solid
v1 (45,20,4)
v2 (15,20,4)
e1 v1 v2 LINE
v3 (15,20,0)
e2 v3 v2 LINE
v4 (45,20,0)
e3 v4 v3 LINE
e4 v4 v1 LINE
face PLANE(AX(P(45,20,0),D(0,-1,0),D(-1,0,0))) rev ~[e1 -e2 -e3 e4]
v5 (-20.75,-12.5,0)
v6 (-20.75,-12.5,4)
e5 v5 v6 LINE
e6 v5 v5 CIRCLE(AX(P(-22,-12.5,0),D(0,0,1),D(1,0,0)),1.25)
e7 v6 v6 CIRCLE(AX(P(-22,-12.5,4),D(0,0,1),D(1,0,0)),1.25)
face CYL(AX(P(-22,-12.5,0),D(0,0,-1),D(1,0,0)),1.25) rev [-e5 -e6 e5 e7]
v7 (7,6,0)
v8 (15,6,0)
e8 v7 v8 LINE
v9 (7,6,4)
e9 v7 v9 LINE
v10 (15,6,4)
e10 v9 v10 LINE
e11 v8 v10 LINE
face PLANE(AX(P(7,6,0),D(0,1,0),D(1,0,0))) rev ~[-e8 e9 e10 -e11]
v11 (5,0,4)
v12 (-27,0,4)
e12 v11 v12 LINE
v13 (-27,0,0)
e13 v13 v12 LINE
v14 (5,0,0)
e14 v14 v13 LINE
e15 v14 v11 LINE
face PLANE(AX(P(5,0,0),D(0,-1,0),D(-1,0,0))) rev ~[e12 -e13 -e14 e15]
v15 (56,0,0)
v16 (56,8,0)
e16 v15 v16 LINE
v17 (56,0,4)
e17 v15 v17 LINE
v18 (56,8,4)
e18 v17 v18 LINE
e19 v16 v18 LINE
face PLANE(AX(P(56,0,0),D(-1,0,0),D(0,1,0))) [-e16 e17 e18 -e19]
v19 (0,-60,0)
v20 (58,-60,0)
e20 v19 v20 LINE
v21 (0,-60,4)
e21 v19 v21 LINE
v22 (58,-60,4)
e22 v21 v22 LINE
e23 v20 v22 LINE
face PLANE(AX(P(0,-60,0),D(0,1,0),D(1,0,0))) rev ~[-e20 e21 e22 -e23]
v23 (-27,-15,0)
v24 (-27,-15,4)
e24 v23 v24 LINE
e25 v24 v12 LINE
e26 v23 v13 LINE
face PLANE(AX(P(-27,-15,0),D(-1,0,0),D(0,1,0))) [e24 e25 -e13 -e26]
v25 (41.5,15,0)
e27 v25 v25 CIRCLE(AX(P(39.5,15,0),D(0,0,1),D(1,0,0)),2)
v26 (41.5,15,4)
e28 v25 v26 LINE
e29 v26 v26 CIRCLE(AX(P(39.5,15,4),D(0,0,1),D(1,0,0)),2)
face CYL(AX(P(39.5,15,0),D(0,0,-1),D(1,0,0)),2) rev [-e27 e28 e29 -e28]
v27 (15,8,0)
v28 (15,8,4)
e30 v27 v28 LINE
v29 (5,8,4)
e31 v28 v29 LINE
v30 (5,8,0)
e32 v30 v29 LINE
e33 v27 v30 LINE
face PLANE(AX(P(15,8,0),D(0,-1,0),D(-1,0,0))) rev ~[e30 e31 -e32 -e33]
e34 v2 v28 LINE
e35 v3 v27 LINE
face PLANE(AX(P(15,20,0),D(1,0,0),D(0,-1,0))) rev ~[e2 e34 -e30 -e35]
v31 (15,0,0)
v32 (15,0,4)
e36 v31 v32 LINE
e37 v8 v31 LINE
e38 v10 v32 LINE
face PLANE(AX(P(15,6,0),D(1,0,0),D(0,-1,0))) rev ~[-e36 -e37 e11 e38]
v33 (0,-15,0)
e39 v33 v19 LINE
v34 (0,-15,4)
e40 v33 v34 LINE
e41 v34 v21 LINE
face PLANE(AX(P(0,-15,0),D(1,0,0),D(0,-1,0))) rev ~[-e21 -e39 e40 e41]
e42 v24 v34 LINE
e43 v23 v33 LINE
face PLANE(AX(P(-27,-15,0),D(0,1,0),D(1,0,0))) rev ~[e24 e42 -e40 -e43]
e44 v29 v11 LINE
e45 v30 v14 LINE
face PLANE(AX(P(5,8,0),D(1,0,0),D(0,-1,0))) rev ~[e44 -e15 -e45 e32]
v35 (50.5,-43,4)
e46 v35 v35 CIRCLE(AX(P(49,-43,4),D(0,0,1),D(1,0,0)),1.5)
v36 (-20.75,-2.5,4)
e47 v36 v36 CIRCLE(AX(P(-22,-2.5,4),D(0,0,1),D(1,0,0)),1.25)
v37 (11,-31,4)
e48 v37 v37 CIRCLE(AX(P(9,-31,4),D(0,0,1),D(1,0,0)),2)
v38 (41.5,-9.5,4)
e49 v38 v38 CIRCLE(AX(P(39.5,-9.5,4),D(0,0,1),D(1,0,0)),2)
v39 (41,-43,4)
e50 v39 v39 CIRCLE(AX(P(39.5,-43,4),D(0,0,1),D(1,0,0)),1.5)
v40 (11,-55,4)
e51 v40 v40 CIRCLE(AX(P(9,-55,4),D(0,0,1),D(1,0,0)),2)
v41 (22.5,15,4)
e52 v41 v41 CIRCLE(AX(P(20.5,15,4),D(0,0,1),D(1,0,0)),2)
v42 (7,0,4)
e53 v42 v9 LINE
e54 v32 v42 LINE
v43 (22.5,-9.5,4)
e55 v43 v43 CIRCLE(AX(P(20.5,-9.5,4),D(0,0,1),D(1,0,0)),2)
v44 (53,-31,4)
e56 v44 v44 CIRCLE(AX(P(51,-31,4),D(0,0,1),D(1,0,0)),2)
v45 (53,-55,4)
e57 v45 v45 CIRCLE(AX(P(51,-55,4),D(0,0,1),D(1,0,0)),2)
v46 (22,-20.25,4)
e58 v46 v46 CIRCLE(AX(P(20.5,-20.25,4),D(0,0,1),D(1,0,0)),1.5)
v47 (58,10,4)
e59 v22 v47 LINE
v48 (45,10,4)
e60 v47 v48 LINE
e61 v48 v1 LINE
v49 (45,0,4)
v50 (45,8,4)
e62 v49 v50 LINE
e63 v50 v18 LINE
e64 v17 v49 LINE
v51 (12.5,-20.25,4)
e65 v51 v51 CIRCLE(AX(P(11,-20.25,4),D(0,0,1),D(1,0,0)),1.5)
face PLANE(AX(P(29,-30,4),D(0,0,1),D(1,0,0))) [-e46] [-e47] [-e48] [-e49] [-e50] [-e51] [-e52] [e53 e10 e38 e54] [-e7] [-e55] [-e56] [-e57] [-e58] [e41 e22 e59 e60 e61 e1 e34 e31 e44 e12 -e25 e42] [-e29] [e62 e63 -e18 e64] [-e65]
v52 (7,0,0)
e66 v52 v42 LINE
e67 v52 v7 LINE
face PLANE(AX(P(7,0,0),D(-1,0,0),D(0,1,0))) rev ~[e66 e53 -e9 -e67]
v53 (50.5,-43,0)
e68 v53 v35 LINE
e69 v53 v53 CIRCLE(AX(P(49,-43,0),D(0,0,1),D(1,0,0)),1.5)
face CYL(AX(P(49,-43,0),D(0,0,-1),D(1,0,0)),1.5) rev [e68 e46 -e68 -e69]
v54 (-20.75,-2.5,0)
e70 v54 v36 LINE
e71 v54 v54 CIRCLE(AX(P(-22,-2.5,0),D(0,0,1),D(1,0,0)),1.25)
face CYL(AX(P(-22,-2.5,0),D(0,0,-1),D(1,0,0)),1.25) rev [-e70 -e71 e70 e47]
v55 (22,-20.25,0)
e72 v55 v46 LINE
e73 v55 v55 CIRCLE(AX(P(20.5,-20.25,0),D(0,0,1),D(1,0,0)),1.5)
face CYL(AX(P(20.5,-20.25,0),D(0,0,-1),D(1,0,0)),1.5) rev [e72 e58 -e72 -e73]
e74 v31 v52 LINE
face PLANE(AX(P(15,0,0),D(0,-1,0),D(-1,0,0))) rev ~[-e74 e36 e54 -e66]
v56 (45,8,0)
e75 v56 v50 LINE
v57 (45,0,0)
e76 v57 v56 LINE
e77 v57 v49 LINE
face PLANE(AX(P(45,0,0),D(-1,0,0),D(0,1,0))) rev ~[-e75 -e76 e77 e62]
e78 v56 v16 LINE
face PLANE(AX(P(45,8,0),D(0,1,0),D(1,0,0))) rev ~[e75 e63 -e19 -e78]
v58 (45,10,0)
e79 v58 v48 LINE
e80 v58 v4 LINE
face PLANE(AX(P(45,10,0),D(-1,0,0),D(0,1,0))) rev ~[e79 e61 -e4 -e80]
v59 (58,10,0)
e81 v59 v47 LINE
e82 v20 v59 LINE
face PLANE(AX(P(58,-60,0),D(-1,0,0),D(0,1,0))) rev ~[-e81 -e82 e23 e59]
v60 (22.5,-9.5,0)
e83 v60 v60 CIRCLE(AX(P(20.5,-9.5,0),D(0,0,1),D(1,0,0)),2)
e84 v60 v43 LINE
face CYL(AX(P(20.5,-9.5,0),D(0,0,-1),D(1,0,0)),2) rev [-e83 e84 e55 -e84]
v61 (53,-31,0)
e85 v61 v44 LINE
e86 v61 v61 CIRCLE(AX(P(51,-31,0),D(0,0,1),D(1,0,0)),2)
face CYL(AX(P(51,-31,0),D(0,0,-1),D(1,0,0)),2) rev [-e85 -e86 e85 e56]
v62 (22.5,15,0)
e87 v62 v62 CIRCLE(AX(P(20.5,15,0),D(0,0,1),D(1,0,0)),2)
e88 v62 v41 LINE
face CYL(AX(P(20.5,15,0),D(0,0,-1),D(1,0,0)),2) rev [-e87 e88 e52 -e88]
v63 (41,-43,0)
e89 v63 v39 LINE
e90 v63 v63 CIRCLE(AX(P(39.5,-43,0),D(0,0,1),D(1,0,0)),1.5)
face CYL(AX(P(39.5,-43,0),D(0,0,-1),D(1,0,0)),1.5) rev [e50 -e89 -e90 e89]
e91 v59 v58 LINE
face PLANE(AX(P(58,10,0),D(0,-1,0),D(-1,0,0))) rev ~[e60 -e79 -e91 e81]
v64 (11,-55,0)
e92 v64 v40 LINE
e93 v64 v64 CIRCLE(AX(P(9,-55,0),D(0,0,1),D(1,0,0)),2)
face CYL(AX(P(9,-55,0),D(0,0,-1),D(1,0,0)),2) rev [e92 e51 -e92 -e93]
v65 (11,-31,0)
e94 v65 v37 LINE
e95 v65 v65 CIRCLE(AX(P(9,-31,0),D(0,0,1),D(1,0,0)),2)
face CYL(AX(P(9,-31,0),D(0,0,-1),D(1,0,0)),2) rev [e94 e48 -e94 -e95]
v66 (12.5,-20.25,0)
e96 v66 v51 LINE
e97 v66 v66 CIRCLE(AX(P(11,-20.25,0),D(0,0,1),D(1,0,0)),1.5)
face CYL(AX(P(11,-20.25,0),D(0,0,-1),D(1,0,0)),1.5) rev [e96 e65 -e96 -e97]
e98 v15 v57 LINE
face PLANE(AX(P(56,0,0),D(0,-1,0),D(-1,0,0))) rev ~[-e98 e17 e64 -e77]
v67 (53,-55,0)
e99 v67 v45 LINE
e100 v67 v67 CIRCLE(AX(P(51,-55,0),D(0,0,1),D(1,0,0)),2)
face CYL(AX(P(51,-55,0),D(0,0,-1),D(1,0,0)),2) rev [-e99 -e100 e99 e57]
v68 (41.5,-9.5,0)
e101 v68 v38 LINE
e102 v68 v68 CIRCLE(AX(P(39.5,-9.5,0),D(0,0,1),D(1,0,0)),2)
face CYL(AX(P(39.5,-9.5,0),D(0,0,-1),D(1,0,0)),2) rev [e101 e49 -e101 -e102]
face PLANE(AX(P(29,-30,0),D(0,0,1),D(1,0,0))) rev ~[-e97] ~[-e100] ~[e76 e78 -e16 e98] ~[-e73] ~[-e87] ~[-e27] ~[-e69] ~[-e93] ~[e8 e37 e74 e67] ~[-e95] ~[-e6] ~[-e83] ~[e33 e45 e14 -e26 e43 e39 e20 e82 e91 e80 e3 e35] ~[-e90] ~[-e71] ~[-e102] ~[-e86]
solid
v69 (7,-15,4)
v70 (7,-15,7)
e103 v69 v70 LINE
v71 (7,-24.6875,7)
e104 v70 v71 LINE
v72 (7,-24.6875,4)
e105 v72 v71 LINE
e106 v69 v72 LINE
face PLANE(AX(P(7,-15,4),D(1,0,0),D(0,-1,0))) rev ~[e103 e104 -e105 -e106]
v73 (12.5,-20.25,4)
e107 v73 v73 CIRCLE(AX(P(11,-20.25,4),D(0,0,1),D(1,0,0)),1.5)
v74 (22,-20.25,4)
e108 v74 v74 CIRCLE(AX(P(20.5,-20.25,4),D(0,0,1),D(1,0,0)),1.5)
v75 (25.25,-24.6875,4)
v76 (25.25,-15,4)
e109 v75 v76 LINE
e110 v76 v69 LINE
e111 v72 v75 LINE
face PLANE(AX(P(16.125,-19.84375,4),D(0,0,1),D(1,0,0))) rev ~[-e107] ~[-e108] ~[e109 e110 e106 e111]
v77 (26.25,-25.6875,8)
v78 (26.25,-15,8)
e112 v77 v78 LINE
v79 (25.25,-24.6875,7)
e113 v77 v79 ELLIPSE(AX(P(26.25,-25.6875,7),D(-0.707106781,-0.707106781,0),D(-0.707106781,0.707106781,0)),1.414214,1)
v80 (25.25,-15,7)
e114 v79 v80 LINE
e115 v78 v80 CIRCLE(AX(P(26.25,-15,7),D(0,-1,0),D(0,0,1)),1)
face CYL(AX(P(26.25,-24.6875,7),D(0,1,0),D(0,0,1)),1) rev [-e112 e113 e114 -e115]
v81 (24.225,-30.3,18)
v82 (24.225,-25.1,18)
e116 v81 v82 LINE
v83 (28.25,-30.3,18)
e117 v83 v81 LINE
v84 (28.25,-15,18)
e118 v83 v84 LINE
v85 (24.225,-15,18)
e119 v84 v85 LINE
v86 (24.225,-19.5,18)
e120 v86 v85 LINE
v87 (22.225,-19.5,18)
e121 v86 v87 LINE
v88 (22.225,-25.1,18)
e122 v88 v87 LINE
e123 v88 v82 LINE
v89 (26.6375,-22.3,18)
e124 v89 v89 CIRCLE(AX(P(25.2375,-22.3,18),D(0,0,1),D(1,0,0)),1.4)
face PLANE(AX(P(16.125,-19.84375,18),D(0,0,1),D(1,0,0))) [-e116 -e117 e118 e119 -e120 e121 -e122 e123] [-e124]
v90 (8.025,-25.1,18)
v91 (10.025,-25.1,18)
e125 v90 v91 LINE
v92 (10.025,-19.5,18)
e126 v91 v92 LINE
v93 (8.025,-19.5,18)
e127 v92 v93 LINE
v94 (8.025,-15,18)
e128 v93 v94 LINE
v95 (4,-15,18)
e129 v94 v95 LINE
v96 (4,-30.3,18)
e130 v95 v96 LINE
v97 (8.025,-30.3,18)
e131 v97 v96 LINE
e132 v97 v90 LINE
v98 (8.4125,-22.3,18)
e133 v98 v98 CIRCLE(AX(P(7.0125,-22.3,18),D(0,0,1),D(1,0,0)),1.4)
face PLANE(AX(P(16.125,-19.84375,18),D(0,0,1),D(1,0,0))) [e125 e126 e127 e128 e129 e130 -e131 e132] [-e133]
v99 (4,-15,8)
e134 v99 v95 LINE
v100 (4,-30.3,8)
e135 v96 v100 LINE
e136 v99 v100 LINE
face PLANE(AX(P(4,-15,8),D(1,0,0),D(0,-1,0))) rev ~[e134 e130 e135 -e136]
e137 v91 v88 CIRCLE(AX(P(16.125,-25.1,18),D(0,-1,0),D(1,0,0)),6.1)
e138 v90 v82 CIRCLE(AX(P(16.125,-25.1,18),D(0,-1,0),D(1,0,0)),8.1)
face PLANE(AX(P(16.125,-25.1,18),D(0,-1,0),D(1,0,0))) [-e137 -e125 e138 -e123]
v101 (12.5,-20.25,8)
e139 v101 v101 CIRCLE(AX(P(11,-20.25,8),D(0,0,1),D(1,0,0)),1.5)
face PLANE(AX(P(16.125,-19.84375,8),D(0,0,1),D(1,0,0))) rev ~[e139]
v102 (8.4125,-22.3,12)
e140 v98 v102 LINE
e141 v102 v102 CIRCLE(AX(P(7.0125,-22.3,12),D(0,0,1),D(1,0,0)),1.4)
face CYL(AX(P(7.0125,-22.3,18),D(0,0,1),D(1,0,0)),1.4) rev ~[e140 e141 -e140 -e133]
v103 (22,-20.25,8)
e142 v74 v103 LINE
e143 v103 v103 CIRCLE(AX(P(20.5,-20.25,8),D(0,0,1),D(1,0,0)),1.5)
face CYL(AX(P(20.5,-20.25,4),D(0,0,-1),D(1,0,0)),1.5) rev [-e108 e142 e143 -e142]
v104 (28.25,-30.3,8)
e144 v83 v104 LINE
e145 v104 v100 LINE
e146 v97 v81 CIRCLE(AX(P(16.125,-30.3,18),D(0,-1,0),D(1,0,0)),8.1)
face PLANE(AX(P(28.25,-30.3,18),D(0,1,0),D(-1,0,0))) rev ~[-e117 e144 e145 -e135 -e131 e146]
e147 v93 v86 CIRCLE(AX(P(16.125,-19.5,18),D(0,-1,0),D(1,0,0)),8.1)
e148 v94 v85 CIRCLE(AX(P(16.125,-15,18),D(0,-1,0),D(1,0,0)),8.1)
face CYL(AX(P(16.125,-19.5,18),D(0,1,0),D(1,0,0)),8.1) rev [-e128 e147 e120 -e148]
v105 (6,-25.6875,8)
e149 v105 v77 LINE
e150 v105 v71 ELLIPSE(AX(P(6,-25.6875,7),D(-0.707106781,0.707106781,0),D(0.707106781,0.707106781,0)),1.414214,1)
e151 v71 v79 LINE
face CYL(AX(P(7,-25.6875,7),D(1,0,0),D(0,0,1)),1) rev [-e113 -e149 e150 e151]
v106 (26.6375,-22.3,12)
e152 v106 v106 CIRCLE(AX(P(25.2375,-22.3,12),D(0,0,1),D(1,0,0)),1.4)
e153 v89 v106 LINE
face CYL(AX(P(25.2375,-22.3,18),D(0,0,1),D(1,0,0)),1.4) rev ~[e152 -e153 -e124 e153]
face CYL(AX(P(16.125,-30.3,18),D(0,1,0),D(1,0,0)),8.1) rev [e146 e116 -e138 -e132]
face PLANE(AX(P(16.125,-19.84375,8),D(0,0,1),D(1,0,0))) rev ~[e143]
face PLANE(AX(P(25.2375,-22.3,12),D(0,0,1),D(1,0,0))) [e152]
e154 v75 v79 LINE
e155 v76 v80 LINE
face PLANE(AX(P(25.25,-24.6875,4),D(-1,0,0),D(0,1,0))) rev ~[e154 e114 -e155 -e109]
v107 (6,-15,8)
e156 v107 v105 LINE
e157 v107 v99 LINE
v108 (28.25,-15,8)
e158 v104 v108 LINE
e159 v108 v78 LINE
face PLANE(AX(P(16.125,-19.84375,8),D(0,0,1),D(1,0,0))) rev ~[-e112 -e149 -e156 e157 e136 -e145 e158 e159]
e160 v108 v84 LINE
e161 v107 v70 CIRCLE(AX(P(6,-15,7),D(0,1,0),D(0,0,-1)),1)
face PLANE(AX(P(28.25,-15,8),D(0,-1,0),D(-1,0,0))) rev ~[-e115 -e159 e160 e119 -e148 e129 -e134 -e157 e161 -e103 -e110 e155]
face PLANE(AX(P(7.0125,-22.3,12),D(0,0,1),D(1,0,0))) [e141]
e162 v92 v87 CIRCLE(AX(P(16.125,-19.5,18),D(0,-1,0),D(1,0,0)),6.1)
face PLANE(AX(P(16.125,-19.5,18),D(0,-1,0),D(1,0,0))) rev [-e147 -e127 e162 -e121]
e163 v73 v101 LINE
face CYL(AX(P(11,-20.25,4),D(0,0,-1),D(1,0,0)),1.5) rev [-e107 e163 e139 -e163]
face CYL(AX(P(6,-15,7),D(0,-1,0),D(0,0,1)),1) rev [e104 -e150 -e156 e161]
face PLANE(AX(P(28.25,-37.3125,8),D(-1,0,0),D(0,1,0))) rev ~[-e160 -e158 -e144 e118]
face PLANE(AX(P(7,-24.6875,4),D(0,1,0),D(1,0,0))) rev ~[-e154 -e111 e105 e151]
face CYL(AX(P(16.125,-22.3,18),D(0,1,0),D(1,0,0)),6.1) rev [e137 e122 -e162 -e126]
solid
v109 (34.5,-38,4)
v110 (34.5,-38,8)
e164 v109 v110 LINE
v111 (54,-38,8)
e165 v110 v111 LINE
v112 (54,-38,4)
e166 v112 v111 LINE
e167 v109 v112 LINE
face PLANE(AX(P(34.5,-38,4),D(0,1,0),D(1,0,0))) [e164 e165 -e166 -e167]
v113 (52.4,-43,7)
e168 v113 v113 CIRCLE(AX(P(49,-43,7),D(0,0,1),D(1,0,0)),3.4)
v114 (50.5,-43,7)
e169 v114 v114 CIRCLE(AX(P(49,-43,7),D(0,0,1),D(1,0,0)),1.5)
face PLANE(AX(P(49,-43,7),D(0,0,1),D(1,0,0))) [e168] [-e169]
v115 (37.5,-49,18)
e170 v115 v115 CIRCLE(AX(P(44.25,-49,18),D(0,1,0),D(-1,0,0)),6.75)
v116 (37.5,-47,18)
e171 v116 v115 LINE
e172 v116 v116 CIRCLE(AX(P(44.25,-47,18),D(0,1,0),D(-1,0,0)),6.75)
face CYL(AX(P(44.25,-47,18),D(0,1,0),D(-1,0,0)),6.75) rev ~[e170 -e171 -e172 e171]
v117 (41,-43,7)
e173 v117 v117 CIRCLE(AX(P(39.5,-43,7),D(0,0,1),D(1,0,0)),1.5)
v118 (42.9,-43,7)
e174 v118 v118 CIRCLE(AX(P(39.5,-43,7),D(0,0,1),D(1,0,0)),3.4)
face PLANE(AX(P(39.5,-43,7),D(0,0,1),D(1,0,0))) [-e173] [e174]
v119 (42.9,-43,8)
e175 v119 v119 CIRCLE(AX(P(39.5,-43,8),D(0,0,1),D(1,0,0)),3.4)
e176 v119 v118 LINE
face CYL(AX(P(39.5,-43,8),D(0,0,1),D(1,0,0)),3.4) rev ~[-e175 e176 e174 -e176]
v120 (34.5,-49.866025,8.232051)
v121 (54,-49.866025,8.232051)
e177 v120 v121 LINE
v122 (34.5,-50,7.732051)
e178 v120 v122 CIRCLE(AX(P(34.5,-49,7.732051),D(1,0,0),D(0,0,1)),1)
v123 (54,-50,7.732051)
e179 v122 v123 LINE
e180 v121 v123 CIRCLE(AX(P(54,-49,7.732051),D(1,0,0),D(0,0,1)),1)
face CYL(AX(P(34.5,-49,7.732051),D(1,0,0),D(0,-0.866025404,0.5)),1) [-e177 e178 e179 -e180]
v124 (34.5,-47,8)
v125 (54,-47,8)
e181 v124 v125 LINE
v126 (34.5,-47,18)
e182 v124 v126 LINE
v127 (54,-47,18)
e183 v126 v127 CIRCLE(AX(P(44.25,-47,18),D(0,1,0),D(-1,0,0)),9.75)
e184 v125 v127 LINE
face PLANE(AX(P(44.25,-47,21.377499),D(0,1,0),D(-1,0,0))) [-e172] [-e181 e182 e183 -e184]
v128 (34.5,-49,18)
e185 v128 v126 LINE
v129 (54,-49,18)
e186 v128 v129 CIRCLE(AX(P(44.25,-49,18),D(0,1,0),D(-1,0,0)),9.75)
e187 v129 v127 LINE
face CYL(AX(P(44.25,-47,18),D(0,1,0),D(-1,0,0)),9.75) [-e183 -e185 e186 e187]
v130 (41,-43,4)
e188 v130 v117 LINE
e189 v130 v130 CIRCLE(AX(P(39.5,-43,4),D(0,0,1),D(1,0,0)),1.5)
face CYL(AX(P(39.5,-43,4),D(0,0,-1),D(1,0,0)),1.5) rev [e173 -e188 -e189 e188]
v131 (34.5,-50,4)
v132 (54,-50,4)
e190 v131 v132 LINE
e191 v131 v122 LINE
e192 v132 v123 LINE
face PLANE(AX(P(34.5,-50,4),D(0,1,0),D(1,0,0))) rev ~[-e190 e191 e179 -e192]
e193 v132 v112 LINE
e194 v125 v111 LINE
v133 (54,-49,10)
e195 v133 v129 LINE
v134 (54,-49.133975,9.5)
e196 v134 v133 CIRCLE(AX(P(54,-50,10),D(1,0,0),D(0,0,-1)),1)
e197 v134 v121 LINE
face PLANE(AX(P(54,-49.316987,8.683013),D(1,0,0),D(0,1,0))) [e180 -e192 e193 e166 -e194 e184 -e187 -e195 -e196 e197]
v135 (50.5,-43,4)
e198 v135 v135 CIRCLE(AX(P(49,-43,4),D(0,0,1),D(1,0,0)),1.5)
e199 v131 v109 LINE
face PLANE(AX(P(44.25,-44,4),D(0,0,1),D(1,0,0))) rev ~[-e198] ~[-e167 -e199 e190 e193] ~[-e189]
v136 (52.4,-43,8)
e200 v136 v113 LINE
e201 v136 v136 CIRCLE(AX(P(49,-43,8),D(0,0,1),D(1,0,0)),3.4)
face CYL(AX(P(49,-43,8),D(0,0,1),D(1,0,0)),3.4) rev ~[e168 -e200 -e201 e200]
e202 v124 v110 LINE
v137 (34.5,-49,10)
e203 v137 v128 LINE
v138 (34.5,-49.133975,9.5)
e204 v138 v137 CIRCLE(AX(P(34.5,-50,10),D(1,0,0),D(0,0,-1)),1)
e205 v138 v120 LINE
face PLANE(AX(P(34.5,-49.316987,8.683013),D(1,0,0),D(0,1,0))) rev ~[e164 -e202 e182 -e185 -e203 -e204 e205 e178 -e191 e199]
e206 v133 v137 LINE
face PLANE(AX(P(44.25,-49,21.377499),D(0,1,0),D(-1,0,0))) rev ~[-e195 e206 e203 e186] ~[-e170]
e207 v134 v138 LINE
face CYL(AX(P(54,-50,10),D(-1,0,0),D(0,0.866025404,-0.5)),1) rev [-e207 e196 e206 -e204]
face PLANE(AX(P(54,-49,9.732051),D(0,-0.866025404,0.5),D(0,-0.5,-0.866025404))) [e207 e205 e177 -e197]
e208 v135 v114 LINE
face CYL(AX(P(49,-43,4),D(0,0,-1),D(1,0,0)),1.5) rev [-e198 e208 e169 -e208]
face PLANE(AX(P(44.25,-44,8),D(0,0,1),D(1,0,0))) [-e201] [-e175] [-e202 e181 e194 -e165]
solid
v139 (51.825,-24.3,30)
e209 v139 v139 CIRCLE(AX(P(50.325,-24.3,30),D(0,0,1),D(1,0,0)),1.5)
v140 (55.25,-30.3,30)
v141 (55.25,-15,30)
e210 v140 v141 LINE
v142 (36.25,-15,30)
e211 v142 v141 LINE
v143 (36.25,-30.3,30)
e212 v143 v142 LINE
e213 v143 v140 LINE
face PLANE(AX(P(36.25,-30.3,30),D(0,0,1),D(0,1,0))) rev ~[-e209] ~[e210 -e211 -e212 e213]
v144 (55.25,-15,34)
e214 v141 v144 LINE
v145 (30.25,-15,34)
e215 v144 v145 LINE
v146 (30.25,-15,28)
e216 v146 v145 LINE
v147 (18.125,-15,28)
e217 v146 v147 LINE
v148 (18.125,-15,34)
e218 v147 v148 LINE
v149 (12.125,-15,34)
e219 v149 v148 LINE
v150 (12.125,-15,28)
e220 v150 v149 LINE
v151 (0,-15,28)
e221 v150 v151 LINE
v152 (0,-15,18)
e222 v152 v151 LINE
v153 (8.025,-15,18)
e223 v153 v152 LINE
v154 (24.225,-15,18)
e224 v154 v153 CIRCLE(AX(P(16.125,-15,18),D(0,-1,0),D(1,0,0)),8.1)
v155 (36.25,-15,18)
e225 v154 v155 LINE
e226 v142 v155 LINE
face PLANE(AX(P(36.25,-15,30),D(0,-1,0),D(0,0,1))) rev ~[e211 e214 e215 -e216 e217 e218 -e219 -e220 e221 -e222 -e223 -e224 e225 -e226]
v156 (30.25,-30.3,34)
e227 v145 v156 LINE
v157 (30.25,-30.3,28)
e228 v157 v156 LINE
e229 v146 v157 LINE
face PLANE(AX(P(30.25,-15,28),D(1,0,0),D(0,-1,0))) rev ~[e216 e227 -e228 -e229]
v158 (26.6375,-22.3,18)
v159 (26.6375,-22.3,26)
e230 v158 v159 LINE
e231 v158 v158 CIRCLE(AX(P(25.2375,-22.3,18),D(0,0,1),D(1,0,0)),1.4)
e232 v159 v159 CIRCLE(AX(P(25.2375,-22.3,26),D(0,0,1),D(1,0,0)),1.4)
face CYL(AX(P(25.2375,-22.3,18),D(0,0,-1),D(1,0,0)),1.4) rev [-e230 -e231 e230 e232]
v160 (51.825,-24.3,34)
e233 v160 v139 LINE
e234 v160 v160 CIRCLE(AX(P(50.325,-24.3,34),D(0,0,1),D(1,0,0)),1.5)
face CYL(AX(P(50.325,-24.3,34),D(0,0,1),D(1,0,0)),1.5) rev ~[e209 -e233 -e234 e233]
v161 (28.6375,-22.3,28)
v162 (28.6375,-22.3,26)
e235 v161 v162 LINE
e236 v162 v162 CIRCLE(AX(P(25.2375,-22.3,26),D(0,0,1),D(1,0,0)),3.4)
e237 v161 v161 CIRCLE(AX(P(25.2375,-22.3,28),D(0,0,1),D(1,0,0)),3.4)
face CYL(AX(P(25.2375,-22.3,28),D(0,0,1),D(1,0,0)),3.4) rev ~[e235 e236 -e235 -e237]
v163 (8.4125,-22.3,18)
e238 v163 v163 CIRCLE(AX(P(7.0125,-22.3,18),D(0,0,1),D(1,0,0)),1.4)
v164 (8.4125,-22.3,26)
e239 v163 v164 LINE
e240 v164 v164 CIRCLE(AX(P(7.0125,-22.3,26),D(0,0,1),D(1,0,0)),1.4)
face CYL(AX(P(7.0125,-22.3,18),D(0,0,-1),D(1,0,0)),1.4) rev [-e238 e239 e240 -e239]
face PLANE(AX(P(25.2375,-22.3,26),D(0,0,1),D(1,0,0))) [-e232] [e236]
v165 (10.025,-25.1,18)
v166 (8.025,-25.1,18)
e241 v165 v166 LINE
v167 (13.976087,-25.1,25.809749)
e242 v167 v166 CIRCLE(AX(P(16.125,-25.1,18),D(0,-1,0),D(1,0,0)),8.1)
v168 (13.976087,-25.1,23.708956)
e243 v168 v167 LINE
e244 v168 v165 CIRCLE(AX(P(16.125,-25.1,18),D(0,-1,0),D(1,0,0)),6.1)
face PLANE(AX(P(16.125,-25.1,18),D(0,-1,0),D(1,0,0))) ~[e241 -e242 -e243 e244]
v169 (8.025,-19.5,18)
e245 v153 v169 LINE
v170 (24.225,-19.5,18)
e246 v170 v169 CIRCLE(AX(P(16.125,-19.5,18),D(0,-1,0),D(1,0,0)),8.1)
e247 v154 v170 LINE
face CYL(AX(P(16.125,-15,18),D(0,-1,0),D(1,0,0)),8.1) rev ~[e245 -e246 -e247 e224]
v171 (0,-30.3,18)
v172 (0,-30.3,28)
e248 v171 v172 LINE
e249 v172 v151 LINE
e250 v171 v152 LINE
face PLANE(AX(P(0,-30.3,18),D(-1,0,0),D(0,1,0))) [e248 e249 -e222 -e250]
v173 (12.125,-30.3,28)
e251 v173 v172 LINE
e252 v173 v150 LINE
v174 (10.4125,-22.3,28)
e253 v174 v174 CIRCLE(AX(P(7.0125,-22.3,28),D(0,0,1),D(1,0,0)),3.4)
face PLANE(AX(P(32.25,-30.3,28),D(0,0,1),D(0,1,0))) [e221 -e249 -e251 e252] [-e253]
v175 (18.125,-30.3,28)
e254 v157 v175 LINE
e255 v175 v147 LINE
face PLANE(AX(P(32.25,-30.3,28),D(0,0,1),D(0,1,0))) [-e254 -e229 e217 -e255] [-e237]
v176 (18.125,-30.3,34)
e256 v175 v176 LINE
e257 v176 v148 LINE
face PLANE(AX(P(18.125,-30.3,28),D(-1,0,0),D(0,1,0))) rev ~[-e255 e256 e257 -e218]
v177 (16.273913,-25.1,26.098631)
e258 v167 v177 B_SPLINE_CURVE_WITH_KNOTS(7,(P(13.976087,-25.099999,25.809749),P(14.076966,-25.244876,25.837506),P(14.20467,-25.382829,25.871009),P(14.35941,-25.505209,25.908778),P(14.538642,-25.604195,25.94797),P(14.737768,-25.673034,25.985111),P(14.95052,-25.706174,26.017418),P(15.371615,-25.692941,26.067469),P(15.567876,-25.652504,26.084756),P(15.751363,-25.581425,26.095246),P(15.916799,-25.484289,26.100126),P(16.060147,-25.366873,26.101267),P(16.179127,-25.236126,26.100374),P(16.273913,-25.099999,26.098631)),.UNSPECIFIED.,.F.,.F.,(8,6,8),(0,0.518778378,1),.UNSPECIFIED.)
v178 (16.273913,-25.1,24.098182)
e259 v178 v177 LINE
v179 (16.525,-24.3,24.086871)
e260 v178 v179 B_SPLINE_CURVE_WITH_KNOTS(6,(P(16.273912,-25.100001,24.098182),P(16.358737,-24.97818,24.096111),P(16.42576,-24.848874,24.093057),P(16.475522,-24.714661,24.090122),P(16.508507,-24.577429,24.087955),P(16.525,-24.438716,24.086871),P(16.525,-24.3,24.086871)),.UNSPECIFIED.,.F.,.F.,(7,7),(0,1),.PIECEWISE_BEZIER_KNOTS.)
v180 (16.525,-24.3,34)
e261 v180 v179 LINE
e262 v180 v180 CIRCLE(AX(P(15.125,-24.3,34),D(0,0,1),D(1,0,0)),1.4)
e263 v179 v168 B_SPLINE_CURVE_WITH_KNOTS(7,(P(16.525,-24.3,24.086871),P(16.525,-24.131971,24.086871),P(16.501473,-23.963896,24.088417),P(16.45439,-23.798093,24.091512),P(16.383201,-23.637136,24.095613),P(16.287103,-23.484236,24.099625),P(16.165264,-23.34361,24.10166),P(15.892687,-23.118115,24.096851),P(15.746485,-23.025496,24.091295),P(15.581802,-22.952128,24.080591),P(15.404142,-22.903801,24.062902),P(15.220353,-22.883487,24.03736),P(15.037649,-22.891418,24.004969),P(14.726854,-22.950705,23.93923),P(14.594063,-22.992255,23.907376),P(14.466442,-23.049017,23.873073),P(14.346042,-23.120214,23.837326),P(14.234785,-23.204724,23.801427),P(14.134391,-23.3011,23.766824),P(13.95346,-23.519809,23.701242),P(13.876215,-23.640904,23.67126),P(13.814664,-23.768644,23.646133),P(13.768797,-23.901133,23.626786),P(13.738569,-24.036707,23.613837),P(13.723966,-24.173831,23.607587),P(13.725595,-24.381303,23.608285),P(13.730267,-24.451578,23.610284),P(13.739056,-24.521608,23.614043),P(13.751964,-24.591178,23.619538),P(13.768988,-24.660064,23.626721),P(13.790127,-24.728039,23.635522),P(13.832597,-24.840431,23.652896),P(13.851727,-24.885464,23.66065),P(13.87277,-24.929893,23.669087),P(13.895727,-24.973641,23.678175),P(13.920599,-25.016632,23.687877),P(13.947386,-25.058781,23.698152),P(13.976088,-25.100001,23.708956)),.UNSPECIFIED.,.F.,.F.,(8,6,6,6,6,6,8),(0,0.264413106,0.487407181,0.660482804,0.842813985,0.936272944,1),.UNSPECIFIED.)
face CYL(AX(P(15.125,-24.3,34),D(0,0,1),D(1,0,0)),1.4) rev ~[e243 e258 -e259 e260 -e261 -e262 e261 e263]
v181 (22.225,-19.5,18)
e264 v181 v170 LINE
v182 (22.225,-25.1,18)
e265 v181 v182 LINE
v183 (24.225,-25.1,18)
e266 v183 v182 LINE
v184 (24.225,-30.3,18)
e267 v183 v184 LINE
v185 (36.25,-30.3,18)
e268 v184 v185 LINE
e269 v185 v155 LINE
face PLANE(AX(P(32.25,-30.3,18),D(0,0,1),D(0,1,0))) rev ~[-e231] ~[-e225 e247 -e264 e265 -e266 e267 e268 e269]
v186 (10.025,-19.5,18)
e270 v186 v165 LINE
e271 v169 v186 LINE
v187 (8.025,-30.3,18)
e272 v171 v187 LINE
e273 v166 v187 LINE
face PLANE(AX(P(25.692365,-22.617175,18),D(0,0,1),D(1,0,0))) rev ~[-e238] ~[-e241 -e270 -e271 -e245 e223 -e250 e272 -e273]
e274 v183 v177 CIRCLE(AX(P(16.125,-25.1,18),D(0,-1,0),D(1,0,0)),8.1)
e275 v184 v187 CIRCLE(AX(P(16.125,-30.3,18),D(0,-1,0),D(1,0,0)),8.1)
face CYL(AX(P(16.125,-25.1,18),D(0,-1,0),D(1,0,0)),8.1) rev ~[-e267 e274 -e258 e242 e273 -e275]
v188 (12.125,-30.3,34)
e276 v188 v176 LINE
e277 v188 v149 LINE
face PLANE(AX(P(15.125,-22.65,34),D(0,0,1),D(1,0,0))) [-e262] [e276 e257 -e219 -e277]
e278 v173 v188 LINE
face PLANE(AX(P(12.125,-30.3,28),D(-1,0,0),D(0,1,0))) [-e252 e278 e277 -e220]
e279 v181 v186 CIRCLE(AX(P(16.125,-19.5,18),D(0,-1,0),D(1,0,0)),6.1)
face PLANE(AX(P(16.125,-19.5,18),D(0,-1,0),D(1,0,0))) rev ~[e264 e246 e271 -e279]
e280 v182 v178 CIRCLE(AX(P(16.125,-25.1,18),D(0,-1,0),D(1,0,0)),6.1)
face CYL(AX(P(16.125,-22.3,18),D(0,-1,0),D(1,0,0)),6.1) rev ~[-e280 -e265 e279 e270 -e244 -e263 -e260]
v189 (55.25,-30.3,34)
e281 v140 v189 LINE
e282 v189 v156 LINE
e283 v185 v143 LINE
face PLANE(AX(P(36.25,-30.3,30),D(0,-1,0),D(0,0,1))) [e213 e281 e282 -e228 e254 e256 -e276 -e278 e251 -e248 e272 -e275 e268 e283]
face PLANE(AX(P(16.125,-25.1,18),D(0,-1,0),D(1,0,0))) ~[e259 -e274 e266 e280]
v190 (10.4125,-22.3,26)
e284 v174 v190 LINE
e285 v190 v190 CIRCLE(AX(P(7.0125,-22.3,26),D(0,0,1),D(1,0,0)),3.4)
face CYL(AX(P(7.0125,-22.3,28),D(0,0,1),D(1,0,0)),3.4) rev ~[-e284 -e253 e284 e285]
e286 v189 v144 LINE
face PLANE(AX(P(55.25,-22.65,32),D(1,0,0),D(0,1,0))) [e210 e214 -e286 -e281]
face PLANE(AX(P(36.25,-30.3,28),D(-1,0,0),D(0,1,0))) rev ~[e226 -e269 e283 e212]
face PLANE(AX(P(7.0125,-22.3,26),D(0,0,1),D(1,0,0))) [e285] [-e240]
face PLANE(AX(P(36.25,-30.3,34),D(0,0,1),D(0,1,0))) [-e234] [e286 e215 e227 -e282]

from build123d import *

# Parameters (mm, degrees)
F0_R      = 2
F0_R_2    = 1.5
F0_W      = 27
F0_H      = 15
F0_R_3    = 1.25
F0_W_2    = 2
F0_H_2    = 8
F1_DEPTH  = 4
F4_R      = 1.5
F6_DEPTH  = 4
F7_R      = 1.5
F8_DEPTH  = 10
F9_W      = 6.1
F9_H      = 5.6
F12_DEPTH = 10
F13_R     = 1.4
F14_DEPTH = 6
F15_R     = 1.4
F15_W     = 4
F15_H     = 15.3
F16_DEPTH = 10
F17_W     = 6.1
F17_H     = 5.6
F19_R     = 3.4
F19_R_2   = 1.4
F20_DEPTH = 2
F21_W     = 19.5
F21_H     = 12
F21_R     = 1.5
F22_DEPTH = 4
F23_R     = 3.4
F23_R_2   = 1.5
F24_DEPTH = 1
F25_W     = 19.5
F25_H     = 2
F26_DEPTH = 10
F28_DEPTH = 2
F29_R     = 6.75
F30_DEPTH = 2
F32_DEPTH = 19.5
F33_R     = 1
F34_R     = 1
F35_W     = 15.3
F35_H     = 10
F36_DEPTH = 4
F37_W     = 6
F37_H     = 15.3
F38_DEPTH = 6
F40_W     = 15.3
F40_H     = 4
F41_DEPTH = 19
F42_R     = 1.4
F42_R_2   = 1.5
F43_DEPTH = 20


# Not quite as in the source:
# - a feature of the source that left no trace in its solid (it failed there, or was rolled back) is left out
# - a feature names something its author has since deleted; it is built from what else it names


with BuildPart() as f1:
    # F0 (on Top) → F1 (new body)
    with BuildSketch(Plane.XY):
        Polygon((5, 0), (0, 0), (0, -15), (0, -60), (58, -60), (58, 0), (56, 0), (45, 0), (15, 0), (7, 0), align=None)
        with Locations((9, -55)):
            Circle(F0_R, mode=Mode.SUBTRACT)
        with Locations((9, -31)):
            Circle(F0_R, mode=Mode.SUBTRACT)
        with Locations((11, -20.25)):
            Circle(F0_R_2, mode=Mode.SUBTRACT)
        with Locations((51, -55)):
            Circle(F0_R, mode=Mode.SUBTRACT)
        with Locations((39.5, -43)):
            Circle(F0_R_2, mode=Mode.SUBTRACT)
        with Locations((49, -43)):
            Circle(F0_R_2, mode=Mode.SUBTRACT)
        with Locations((20.5, -31.625)):
            Circle(F0_R_2, mode=Mode.SUBTRACT)
        with Locations((30, -31.625)):
            Circle(F0_R_2, mode=Mode.SUBTRACT)
        with Locations((20.5, -20.25)):
            Circle(F0_R_2, mode=Mode.SUBTRACT)
        with Locations((30, -20.25)):
            Circle(F0_R_2, mode=Mode.SUBTRACT)
        with Locations((39.5, -31.625)):
            Circle(F0_R_2, mode=Mode.SUBTRACT)
        with Locations((51, -31)):
            Circle(F0_R, mode=Mode.SUBTRACT)
        with Locations((39.5, -20.25)):
            Circle(F0_R_2, mode=Mode.SUBTRACT)
        with Locations((49, -20.25)):
            Circle(F0_R_2, mode=Mode.SUBTRACT)
        with Locations((20.5, -9.5)):
            Circle(F0_R, mode=Mode.SUBTRACT)
        with Locations((39.5, -9.5)):
            Circle(F0_R, mode=Mode.SUBTRACT)
        with Locations((-13.5, -7.5)):
            Rectangle(F0_W, F0_H)
        with Locations((-22, -12.5)):
            Circle(F0_R_3, mode=Mode.SUBTRACT)
        with Locations((-22, -2.5)):
            Circle(F0_R_3, mode=Mode.SUBTRACT)
        Polygon((15, 6), (15, 0), (45, 0), (45, 8), (45, 10), (45, 20), (15, 20), (15, 8), align=None)
        with Locations((20.5, 2.75)):
            Circle(F0_R_2, mode=Mode.SUBTRACT)
        with Locations((30, 2.75)):
            Circle(F0_R_2, mode=Mode.SUBTRACT)
        with Locations((20.5, 15)):
            Circle(F0_R, mode=Mode.SUBTRACT)
        with Locations((39.5, 2.75)):
            Circle(F0_R_2, mode=Mode.SUBTRACT)
        with Locations((39.5, 15)):
            Circle(F0_R, mode=Mode.SUBTRACT)
        with Locations((30, -20.25)):
            Circle(F0_R_2)
        with Locations((39.5, -20.25)):
            Circle(F0_R_2)
        with Locations((49, -20.25)):
            Circle(F0_R_2)
        with Locations((30, -31.625)):
            Circle(F0_R_2)
        with Locations((39.5, -31.625)):
            Circle(F0_R_2)
        with Locations((20.5, 2.75)):
            Circle(F0_R_2)
        with Locations((30, 2.75)):
            Circle(F0_R_2)
        with Locations((39.5, 2.75)):
            Circle(F0_R_2)
        with Locations((20.5, -31.625)):
            Circle(F0_R_2)
        Polygon((45, 10), (45, 8), (56, 8), (58, 8), (58, 10), align=None)
        with Locations((57, 4)):
            Rectangle(F0_W_2, F0_H_2)
        Polygon((5, 8), (5, 0), (7, 0), (7, 6), (15, 6), (15, 8), align=None)
    extrude(amount=F1_DEPTH)


with BuildPart() as f6:
    # F4 (on face) → F6 (new body)
    with BuildSketch(Plane.XY.offset(4)):
        Polygon((25.25, -15), (7, -15), (7, -24.6875), (9, -24.6875), (25.25, -24.6875), align=None)
        with Locations((11, -20.25)):
            Circle(F4_R, mode=Mode.SUBTRACT)
        with Locations((20.5, -20.25)):
            Circle(F4_R, mode=Mode.SUBTRACT)
    extrude(amount=F6_DEPTH)

    # F7 (on face) → F8 (join)
    with BuildSketch(Plane.XY.offset(8)):
        Polygon((25.25, -15), (7, -15), (7, -24.6875), (9, -24.6875), (25.25, -24.6875), align=None)
        with Locations((11, -20.25)):
            Circle(F7_R, mode=Mode.SUBTRACT)
        with Locations((20.5, -20.25)):
            Circle(F7_R, mode=Mode.SUBTRACT)
        Polygon((7, -24.6875), (7, -15), (4, -15), (4, -37.3125), (7, -37.3125), align=None)
        with BuildLine():
            Line((9, -24.6875), (7, -24.6875))
            Line((7, -24.6875), (7, -37.3125))
            Line((7, -37.3125), (15.3125, -37.3125))
            Line((15.3125, -37.3125), (15.3125, -31))
            ThreePointArc((15.3125, -31), (13.4636115562, -26.5363884438), (9, -24.6875))
        make_face()
        with BuildLine():
            Line((25.25, -24.6875), (9, -24.6875))
            ThreePointArc((9, -24.6875), (13.4636115562, -26.5363884438), (15.3125, -31))
            Line((15.3125, -31), (15.3125, -37.3125))
            Line((15.3125, -37.3125), (25.25, -37.3125))
            Line((25.25, -37.3125), (25.25, -24.6875))
        make_face()
        Polygon((28.25, -15), (25.25, -15), (25.25, -24.6875), (25.25, -37.3125), (28.25, -37.3125), align=None)
        with Locations((11, -20.25)):
            Circle(F7_R)
        with Locations((20.5, -20.25)):
            Circle(F7_R)
    extrude(amount=F8_DEPTH)

    # F9 (on face) → F10 (revolve, cut)
    with BuildSketch(Plane.XY.offset(18)):
        Polygon((22.225, -25.1), (16.125, -25.1), (16.125, -30.3), (24.225, -30.3), (24.225, -25.1), align=None)
        Polygon((24.225, -15), (16.125, -15), (16.125, -19.5), (22.225, -19.5), (24.225, -19.5), align=None)
        with Locations((19.175, -22.3)):
            Rectangle(F9_W, F9_H)
    revolve(axis=Axis((16.125, -22.3, 18), (0, -1, 0)), mode=Mode.SUBTRACT)

    # F11 (on face) → F12 (cut, through all)
    with BuildSketch(Plane.XY.offset(18)):
        Polygon((8.025, -30.3), (4, -30.3), (4, -37.3125), (28.25, -37.3125), (28.25, -30.3), (24.225, -30.3), align=None)
    extrude(amount=-F12_DEPTH, mode=Mode.SUBTRACT)

    # F13 (on face) → F14 (cut)
    with BuildSketch(Plane.XY.offset(18)):
        with Locations((7.0125, -22.3)):
            Circle(F13_R)
        with Locations((25.2375, -22.3)):
            Circle(F13_R)
    extrude(amount=-F14_DEPTH, mode=Mode.SUBTRACT)

    # F34
    f34_edges = [f6.edges().sort_by_distance(p)[0] for p in [
        (25.25, -19.84375, 8),
        (16.125, -24.6875, 8),
        (7, -19.84375, 8),
    ]]
    fillet(f34_edges, radius=F34_R)


with BuildPart() as f16:
    # F15 (on face) → F16 (new body)
    with BuildSketch(Plane.XY.offset(18)):
        Polygon((25.25, -15), (24.225, -15), (24.225, -19.5), (22.225, -19.5), (22.225, -25.1), (24.225, -25.1), (24.225, -30.3), (28.25, -30.3), (28.25, -15), align=None)
        with Locations((25.2375, -22.3)):
            Circle(F15_R, mode=Mode.SUBTRACT)
        Polygon((7, -15), (4, -15), (4, -30.3), (8.025, -30.3), (8.025, -25.1), (10.025, -25.1), (10.025, -19.5), (8.025, -19.5), (8.025, -15), align=None)
        with Locations((7.0125, -22.3)):
            Circle(F15_R, mode=Mode.SUBTRACT)
        Polygon((24.225, -15), (8.025, -15), (8.025, -19.5), (10.025, -19.5), (10.025, -25.1), (8.025, -25.1), (8.025, -30.3), (24.225, -30.3), (24.225, -25.1), (22.225, -25.1), (22.225, -19.5), (24.225, -19.5), align=None)
        with Locations((2, -22.65)):
            Rectangle(F15_W, F15_H)
        with Locations((30.25, -22.65)):
            Rectangle(F15_W, F15_H)
    extrude(amount=F16_DEPTH)

    # F17 (on face) → F18 (revolve, cut)
    with BuildSketch(Plane(origin=(0, 0, 18), x_dir=(1, 0, 0), z_dir=(0, 0, -1))):
        with Locations((19.175, 22.3)):
            Rectangle(F17_W, F17_H)
        Polygon((24.225, 19.5), (22.225, 19.5), (16.125, 19.5), (16.125, 15), (24.225, 15), align=None)
        Polygon((16.125, 25.1), (22.225, 25.1), (24.225, 25.1), (24.225, 30.3), (16.125, 30.3), align=None)
    revolve(axis=Axis((16.125, -22.3, 18), (0, -1, 0)), mode=Mode.SUBTRACT)

    # F19 (on face) → F20 (cut)
    with BuildSketch(Plane.XY.offset(28)):
        with Locations((7.0125, -22.3)):
            Circle(F19_R)
        with Locations((7.0125, -22.3)):
            Circle(F19_R_2, mode=Mode.SUBTRACT)
        with Locations((25.2375, -22.3)):
            Circle(F19_R)
        with Locations((25.2375, -22.3)):
            Circle(F19_R_2, mode=Mode.SUBTRACT)
    extrude(amount=-F20_DEPTH, mode=Mode.SUBTRACT)

    # F35 (on face) → F36 (join)
    with BuildSketch(Plane.YZ.offset(32.25)):
        with Locations((-22.65, 23)):
            Rectangle(F35_W, F35_H)
    extrude(amount=F36_DEPTH)

    # F37 (on face) → F38 (join)
    with BuildSketch(Plane.XY.offset(28)):
        with Locations((15.125, -22.65)):
            Rectangle(F37_W, F37_H)
        Polygon((32.25, -15), (30.25, -15), (30.25, -30.3), (32.25, -30.3), (36.25, -30.3), (36.25, -15), align=None)
    extrude(amount=F38_DEPTH)

    # F40 (on face) → F41 (join)
    with BuildSketch(Plane.YZ.offset(36.25)):
        with Locations((-22.65, 32)):
            Rectangle(F40_W, F40_H)
    extrude(amount=F41_DEPTH)

    # F42 (on face) → F43 (cut)
    with BuildSketch(Plane.XY.offset(34)):
        with Locations((15.125, -24.3)):
            Circle(F42_R)
        with Locations((50.325, -24.3)):
            Circle(F42_R_2)
    extrude(amount=-F43_DEPTH, mode=Mode.SUBTRACT)


with BuildPart() as f22:
    # F21 (on face) → F22 (new body)
    with BuildSketch(Plane.XY.offset(4)):
        with Locations((44.25, -44)):
            Rectangle(F21_W, F21_H)
        with Locations((39.5, -43)):
            Circle(F21_R, mode=Mode.SUBTRACT)
        with Locations((49, -43)):
            Circle(F21_R, mode=Mode.SUBTRACT)
    extrude(amount=F22_DEPTH)

    # F23 (on face) → F24 (cut)
    with BuildSketch(Plane.XY.offset(8)):
        with Locations((39.5, -43)):
            Circle(F23_R)
        with Locations((39.5, -43)):
            Circle(F23_R_2, mode=Mode.SUBTRACT)
        with Locations((49, -43)):
            Circle(F23_R)
        with Locations((49, -43)):
            Circle(F23_R_2, mode=Mode.SUBTRACT)
    extrude(amount=-F24_DEPTH, mode=Mode.SUBTRACT)

    # F25 (on face) → F26 (join)
    with BuildSketch(Plane.XY.offset(8)):
        with Locations((44.25, -48)):
            Rectangle(F25_W, F25_H)
    extrude(amount=F26_DEPTH)

    # F27 (on face) → F28 (join)
    with BuildSketch(Plane(origin=(0, -47, 0), x_dir=(-1, 0, 0), z_dir=(0, 1, 0))):
        with BuildLine():
            Line((-54, 18), (-34.5, 18))
            ThreePointArc((-34.5, 18), (-44.25, 27.75), (-54, 18))
        make_face()
    extrude(amount=-F28_DEPTH)

    # F29 (on face) → F30 (cut, through all)
    with BuildSketch(Plane(origin=(0, -47, 0), x_dir=(-1, 0, 0), z_dir=(0, 1, 0))):
        with Locations((-44.25, 18)):
            Circle(F29_R)
    extrude(amount=-F30_DEPTH, mode=Mode.SUBTRACT)

    # F31 (on face) → F32 (join)
    with BuildSketch(Plane.YZ.offset(54)):
        Polygon((-49, 9.7320508076), (-50, 8), (-49, 8), align=None)
    extrude(amount=-F32_DEPTH)

    # F33
    f33_edges = [f22.edges().sort_by_distance(p)[0] for p in [
        (44.25, -50, 8),
        (44.25, -49, 9.732051),
    ]]
    fillet(f33_edges, radius=F33_R)


solid = Compound([f1.part, f6.part, f16.part, f22.part])
